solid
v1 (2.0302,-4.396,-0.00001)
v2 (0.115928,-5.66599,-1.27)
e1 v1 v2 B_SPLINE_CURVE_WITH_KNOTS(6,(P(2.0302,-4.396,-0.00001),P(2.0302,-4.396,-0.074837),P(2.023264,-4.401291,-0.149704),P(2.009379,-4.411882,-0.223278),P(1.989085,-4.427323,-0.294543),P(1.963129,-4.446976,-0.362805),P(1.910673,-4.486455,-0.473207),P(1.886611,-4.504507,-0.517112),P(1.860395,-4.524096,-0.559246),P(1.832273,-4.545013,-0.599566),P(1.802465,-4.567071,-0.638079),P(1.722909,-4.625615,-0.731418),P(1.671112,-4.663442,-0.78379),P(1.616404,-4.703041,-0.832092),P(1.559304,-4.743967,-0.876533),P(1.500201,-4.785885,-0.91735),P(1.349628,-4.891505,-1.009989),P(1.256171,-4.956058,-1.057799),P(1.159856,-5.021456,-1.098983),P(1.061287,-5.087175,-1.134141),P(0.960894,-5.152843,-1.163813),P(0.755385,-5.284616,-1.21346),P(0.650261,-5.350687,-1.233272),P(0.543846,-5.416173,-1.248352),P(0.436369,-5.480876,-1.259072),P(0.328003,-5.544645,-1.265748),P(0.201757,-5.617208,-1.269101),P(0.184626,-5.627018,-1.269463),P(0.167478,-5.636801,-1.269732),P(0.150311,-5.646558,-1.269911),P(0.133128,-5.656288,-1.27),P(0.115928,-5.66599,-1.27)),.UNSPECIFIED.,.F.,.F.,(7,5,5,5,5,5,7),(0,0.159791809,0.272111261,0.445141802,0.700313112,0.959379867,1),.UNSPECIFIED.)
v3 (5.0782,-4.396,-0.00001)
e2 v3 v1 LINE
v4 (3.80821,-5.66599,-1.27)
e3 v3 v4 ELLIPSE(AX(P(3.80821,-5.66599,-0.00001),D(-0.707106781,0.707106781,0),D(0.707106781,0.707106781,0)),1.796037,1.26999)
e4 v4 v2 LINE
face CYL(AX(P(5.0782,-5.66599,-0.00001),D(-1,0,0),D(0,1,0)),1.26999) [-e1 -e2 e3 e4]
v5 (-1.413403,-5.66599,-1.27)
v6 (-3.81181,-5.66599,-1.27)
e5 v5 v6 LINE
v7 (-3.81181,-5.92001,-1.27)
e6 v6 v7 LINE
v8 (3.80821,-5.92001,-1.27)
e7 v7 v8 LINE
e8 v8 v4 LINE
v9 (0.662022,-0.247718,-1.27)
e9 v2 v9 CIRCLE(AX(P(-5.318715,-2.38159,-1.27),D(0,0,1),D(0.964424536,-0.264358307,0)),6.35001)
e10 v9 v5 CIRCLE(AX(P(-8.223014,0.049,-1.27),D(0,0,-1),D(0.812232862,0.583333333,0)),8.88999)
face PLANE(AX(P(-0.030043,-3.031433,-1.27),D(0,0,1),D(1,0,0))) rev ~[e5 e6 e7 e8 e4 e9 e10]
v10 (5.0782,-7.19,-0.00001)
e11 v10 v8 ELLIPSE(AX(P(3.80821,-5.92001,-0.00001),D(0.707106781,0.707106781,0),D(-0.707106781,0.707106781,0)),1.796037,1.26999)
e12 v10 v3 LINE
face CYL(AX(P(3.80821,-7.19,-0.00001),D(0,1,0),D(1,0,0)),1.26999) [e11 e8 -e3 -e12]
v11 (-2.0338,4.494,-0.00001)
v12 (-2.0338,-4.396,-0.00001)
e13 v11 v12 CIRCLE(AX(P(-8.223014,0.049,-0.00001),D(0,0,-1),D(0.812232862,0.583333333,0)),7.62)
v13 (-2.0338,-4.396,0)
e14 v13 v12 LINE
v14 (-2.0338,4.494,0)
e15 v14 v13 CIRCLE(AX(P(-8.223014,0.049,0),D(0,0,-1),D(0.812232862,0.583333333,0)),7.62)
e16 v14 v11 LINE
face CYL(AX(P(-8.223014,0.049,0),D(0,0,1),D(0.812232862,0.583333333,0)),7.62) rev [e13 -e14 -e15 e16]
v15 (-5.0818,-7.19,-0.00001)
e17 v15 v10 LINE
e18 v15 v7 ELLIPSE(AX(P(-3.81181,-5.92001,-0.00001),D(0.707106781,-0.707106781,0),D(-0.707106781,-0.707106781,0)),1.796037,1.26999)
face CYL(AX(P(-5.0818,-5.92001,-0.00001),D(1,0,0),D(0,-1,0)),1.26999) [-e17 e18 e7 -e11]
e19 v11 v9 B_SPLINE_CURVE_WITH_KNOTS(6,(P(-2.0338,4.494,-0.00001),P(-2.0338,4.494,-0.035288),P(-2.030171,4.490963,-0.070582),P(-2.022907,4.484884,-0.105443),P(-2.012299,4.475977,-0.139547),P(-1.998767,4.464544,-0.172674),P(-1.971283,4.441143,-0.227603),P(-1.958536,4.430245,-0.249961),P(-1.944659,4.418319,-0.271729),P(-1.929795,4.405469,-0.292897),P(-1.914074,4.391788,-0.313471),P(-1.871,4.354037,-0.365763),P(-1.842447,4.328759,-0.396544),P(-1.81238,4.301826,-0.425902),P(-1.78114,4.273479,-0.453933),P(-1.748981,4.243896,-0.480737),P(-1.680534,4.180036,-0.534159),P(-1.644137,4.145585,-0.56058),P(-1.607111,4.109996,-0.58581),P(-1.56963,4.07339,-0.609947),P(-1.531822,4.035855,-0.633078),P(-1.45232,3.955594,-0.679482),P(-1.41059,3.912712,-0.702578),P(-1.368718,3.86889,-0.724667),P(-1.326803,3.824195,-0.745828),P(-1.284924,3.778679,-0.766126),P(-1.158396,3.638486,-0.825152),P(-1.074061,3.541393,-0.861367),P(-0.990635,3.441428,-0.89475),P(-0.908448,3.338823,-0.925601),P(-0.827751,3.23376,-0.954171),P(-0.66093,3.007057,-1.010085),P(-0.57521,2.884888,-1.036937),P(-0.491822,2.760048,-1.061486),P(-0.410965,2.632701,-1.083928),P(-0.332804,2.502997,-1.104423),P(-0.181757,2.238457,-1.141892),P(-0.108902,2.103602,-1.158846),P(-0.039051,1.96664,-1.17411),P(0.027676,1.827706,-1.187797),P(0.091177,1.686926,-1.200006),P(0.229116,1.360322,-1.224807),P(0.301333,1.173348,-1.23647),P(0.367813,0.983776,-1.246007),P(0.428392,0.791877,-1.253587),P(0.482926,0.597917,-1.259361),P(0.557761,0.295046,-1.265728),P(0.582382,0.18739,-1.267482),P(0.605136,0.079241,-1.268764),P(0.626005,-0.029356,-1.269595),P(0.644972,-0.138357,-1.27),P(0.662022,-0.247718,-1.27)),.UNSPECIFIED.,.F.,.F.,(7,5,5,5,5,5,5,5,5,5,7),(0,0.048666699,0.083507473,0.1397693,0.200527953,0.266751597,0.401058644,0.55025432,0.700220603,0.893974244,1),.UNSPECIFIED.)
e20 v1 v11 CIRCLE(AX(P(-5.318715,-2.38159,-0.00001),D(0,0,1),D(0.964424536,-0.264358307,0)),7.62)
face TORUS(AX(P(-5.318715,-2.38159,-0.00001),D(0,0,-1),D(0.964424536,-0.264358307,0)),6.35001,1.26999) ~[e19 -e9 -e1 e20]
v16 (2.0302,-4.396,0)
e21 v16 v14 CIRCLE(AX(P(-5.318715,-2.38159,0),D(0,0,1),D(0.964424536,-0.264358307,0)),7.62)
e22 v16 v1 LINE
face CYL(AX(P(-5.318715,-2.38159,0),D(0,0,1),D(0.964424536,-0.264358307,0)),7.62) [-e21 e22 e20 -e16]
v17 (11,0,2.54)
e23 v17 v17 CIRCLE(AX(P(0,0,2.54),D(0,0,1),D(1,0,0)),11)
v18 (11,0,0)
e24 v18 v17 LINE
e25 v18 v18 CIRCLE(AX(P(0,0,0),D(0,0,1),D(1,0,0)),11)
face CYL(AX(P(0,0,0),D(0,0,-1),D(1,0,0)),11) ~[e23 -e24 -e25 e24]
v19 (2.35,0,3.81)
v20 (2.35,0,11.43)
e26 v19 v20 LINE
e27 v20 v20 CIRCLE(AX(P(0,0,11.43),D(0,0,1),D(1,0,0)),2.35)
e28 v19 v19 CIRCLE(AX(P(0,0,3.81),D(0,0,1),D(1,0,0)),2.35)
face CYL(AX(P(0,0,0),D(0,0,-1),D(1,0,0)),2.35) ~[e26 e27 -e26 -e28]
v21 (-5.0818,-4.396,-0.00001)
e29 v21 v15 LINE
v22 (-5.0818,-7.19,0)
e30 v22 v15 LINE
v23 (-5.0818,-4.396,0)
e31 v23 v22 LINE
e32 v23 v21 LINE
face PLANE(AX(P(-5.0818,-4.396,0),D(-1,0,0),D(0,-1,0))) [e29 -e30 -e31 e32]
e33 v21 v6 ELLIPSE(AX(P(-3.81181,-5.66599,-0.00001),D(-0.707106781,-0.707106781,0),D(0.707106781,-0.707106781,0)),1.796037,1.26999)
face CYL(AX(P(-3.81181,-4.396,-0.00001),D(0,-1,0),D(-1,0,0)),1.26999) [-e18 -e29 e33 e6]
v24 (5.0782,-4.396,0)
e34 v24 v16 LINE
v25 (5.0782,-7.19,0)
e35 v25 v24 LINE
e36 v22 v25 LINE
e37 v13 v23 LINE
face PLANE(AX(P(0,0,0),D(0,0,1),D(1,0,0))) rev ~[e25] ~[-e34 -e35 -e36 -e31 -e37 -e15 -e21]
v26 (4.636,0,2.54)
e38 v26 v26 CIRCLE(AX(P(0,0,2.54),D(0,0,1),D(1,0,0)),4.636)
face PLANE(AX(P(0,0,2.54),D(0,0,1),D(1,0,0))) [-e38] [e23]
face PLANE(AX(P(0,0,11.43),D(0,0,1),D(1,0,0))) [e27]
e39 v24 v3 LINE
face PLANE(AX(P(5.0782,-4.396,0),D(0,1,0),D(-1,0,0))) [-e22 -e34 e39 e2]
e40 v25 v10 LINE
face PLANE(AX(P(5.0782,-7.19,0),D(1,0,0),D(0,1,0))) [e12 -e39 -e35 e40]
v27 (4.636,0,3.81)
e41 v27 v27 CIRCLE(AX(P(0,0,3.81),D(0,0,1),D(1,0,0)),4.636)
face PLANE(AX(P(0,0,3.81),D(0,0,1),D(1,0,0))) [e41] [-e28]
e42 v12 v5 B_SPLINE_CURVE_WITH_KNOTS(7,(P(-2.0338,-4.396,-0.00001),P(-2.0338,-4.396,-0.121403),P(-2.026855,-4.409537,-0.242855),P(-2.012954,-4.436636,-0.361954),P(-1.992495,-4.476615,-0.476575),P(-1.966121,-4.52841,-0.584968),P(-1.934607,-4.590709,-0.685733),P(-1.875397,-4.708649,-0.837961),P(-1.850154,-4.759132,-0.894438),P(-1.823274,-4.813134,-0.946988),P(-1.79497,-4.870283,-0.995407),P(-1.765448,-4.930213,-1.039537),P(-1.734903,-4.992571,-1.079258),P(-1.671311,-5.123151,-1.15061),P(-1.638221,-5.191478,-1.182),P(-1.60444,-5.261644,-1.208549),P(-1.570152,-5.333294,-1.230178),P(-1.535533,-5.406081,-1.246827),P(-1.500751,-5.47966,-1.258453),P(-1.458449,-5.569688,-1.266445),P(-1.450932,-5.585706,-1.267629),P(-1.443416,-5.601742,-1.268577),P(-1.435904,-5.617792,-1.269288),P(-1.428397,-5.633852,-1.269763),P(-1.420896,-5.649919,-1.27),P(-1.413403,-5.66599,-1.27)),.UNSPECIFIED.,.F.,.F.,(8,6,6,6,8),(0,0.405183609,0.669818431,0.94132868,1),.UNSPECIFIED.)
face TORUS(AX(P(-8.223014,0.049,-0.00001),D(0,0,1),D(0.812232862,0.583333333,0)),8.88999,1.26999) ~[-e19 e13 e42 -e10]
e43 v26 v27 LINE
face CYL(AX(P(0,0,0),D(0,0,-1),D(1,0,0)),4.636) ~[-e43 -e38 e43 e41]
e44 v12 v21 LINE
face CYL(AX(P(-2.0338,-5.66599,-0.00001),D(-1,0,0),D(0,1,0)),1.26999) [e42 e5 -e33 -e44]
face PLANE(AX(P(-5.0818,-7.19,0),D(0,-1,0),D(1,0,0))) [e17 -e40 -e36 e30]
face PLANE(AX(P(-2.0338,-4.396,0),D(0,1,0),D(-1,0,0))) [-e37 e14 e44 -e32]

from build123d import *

# Parameters (mm, degrees)
F0_R     = 2.35
F1_DEPTH = 11.43
F0_R_2   = 4.636
F2_DEPTH = 3.81
F0_R_3   = 11
F3_DEPTH = 2.54
F5_DEPTH = 1.27
F6_R     = 1.26999


# Not quite as in the source:
# - a fillet or chamfer is up to 0.001 mm smaller than in the source, because OpenCascade refuses the exact size


with BuildPart() as f1:
    # F0 (on Top) → F1 (new body)
    with BuildSketch(Plane.XY):
        Circle(F0_R)
    extrude(amount=F1_DEPTH)

    # F0 (on Top) → F2 (join)
    with BuildSketch(Plane.XY):
        Circle(F0_R_2)
        Circle(F0_R, mode=Mode.SUBTRACT)
    extrude(amount=F2_DEPTH)

    # F0 (on Top) → F3 (join)
    with BuildSketch(Plane.XY):
        Circle(F0_R_3)
        Circle(F0_R_2, mode=Mode.SUBTRACT)
    extrude(amount=F3_DEPTH)

    # F4 (on face) → F5 (join)
    with BuildSketch(Plane.XY):
        with BuildLine():
            Line((-5.0818, -4.396), (-5.0818, -7.19))
            Line((-5.0818, -7.19), (5.0782, -7.19))
            Line((5.0782, -7.19), (5.0782, -4.396))
            Line((5.0782, -4.396), (2.0302, -4.396))
            ThreePointArc((2.0302, -4.396), (1.611480541, 0.7864996759), (-2.0338, 4.494))
            ThreePointArc((-2.0338, 4.494), (-0.603014409, 0.049), (-2.0338, -4.396))
            Line((-2.0338, -4.396), (-5.0818, -4.396))
        make_face()
    extrude(amount=-F5_DEPTH)

    # F6 (radius 1.27 in the source; OpenCascade refuses exactly that, so slightly less here)
    f6_edges = [f1.edges().sort_by_distance(p)[0] for p in [
        (5.0782, -5.793, -1.27),
        (-5.0818, -5.793, -1.27),
        (-0.0018, -7.19, -1.27),
        (-3.5578, -4.396, -1.27),
        (3.5542, -4.396, -1.27),
        (1.611481, 0.7865, -1.27),
        (-0.603014, 0.049, -1.27),
    ]]
    fillet(f6_edges, radius=F6_R)


solid = f1.part
